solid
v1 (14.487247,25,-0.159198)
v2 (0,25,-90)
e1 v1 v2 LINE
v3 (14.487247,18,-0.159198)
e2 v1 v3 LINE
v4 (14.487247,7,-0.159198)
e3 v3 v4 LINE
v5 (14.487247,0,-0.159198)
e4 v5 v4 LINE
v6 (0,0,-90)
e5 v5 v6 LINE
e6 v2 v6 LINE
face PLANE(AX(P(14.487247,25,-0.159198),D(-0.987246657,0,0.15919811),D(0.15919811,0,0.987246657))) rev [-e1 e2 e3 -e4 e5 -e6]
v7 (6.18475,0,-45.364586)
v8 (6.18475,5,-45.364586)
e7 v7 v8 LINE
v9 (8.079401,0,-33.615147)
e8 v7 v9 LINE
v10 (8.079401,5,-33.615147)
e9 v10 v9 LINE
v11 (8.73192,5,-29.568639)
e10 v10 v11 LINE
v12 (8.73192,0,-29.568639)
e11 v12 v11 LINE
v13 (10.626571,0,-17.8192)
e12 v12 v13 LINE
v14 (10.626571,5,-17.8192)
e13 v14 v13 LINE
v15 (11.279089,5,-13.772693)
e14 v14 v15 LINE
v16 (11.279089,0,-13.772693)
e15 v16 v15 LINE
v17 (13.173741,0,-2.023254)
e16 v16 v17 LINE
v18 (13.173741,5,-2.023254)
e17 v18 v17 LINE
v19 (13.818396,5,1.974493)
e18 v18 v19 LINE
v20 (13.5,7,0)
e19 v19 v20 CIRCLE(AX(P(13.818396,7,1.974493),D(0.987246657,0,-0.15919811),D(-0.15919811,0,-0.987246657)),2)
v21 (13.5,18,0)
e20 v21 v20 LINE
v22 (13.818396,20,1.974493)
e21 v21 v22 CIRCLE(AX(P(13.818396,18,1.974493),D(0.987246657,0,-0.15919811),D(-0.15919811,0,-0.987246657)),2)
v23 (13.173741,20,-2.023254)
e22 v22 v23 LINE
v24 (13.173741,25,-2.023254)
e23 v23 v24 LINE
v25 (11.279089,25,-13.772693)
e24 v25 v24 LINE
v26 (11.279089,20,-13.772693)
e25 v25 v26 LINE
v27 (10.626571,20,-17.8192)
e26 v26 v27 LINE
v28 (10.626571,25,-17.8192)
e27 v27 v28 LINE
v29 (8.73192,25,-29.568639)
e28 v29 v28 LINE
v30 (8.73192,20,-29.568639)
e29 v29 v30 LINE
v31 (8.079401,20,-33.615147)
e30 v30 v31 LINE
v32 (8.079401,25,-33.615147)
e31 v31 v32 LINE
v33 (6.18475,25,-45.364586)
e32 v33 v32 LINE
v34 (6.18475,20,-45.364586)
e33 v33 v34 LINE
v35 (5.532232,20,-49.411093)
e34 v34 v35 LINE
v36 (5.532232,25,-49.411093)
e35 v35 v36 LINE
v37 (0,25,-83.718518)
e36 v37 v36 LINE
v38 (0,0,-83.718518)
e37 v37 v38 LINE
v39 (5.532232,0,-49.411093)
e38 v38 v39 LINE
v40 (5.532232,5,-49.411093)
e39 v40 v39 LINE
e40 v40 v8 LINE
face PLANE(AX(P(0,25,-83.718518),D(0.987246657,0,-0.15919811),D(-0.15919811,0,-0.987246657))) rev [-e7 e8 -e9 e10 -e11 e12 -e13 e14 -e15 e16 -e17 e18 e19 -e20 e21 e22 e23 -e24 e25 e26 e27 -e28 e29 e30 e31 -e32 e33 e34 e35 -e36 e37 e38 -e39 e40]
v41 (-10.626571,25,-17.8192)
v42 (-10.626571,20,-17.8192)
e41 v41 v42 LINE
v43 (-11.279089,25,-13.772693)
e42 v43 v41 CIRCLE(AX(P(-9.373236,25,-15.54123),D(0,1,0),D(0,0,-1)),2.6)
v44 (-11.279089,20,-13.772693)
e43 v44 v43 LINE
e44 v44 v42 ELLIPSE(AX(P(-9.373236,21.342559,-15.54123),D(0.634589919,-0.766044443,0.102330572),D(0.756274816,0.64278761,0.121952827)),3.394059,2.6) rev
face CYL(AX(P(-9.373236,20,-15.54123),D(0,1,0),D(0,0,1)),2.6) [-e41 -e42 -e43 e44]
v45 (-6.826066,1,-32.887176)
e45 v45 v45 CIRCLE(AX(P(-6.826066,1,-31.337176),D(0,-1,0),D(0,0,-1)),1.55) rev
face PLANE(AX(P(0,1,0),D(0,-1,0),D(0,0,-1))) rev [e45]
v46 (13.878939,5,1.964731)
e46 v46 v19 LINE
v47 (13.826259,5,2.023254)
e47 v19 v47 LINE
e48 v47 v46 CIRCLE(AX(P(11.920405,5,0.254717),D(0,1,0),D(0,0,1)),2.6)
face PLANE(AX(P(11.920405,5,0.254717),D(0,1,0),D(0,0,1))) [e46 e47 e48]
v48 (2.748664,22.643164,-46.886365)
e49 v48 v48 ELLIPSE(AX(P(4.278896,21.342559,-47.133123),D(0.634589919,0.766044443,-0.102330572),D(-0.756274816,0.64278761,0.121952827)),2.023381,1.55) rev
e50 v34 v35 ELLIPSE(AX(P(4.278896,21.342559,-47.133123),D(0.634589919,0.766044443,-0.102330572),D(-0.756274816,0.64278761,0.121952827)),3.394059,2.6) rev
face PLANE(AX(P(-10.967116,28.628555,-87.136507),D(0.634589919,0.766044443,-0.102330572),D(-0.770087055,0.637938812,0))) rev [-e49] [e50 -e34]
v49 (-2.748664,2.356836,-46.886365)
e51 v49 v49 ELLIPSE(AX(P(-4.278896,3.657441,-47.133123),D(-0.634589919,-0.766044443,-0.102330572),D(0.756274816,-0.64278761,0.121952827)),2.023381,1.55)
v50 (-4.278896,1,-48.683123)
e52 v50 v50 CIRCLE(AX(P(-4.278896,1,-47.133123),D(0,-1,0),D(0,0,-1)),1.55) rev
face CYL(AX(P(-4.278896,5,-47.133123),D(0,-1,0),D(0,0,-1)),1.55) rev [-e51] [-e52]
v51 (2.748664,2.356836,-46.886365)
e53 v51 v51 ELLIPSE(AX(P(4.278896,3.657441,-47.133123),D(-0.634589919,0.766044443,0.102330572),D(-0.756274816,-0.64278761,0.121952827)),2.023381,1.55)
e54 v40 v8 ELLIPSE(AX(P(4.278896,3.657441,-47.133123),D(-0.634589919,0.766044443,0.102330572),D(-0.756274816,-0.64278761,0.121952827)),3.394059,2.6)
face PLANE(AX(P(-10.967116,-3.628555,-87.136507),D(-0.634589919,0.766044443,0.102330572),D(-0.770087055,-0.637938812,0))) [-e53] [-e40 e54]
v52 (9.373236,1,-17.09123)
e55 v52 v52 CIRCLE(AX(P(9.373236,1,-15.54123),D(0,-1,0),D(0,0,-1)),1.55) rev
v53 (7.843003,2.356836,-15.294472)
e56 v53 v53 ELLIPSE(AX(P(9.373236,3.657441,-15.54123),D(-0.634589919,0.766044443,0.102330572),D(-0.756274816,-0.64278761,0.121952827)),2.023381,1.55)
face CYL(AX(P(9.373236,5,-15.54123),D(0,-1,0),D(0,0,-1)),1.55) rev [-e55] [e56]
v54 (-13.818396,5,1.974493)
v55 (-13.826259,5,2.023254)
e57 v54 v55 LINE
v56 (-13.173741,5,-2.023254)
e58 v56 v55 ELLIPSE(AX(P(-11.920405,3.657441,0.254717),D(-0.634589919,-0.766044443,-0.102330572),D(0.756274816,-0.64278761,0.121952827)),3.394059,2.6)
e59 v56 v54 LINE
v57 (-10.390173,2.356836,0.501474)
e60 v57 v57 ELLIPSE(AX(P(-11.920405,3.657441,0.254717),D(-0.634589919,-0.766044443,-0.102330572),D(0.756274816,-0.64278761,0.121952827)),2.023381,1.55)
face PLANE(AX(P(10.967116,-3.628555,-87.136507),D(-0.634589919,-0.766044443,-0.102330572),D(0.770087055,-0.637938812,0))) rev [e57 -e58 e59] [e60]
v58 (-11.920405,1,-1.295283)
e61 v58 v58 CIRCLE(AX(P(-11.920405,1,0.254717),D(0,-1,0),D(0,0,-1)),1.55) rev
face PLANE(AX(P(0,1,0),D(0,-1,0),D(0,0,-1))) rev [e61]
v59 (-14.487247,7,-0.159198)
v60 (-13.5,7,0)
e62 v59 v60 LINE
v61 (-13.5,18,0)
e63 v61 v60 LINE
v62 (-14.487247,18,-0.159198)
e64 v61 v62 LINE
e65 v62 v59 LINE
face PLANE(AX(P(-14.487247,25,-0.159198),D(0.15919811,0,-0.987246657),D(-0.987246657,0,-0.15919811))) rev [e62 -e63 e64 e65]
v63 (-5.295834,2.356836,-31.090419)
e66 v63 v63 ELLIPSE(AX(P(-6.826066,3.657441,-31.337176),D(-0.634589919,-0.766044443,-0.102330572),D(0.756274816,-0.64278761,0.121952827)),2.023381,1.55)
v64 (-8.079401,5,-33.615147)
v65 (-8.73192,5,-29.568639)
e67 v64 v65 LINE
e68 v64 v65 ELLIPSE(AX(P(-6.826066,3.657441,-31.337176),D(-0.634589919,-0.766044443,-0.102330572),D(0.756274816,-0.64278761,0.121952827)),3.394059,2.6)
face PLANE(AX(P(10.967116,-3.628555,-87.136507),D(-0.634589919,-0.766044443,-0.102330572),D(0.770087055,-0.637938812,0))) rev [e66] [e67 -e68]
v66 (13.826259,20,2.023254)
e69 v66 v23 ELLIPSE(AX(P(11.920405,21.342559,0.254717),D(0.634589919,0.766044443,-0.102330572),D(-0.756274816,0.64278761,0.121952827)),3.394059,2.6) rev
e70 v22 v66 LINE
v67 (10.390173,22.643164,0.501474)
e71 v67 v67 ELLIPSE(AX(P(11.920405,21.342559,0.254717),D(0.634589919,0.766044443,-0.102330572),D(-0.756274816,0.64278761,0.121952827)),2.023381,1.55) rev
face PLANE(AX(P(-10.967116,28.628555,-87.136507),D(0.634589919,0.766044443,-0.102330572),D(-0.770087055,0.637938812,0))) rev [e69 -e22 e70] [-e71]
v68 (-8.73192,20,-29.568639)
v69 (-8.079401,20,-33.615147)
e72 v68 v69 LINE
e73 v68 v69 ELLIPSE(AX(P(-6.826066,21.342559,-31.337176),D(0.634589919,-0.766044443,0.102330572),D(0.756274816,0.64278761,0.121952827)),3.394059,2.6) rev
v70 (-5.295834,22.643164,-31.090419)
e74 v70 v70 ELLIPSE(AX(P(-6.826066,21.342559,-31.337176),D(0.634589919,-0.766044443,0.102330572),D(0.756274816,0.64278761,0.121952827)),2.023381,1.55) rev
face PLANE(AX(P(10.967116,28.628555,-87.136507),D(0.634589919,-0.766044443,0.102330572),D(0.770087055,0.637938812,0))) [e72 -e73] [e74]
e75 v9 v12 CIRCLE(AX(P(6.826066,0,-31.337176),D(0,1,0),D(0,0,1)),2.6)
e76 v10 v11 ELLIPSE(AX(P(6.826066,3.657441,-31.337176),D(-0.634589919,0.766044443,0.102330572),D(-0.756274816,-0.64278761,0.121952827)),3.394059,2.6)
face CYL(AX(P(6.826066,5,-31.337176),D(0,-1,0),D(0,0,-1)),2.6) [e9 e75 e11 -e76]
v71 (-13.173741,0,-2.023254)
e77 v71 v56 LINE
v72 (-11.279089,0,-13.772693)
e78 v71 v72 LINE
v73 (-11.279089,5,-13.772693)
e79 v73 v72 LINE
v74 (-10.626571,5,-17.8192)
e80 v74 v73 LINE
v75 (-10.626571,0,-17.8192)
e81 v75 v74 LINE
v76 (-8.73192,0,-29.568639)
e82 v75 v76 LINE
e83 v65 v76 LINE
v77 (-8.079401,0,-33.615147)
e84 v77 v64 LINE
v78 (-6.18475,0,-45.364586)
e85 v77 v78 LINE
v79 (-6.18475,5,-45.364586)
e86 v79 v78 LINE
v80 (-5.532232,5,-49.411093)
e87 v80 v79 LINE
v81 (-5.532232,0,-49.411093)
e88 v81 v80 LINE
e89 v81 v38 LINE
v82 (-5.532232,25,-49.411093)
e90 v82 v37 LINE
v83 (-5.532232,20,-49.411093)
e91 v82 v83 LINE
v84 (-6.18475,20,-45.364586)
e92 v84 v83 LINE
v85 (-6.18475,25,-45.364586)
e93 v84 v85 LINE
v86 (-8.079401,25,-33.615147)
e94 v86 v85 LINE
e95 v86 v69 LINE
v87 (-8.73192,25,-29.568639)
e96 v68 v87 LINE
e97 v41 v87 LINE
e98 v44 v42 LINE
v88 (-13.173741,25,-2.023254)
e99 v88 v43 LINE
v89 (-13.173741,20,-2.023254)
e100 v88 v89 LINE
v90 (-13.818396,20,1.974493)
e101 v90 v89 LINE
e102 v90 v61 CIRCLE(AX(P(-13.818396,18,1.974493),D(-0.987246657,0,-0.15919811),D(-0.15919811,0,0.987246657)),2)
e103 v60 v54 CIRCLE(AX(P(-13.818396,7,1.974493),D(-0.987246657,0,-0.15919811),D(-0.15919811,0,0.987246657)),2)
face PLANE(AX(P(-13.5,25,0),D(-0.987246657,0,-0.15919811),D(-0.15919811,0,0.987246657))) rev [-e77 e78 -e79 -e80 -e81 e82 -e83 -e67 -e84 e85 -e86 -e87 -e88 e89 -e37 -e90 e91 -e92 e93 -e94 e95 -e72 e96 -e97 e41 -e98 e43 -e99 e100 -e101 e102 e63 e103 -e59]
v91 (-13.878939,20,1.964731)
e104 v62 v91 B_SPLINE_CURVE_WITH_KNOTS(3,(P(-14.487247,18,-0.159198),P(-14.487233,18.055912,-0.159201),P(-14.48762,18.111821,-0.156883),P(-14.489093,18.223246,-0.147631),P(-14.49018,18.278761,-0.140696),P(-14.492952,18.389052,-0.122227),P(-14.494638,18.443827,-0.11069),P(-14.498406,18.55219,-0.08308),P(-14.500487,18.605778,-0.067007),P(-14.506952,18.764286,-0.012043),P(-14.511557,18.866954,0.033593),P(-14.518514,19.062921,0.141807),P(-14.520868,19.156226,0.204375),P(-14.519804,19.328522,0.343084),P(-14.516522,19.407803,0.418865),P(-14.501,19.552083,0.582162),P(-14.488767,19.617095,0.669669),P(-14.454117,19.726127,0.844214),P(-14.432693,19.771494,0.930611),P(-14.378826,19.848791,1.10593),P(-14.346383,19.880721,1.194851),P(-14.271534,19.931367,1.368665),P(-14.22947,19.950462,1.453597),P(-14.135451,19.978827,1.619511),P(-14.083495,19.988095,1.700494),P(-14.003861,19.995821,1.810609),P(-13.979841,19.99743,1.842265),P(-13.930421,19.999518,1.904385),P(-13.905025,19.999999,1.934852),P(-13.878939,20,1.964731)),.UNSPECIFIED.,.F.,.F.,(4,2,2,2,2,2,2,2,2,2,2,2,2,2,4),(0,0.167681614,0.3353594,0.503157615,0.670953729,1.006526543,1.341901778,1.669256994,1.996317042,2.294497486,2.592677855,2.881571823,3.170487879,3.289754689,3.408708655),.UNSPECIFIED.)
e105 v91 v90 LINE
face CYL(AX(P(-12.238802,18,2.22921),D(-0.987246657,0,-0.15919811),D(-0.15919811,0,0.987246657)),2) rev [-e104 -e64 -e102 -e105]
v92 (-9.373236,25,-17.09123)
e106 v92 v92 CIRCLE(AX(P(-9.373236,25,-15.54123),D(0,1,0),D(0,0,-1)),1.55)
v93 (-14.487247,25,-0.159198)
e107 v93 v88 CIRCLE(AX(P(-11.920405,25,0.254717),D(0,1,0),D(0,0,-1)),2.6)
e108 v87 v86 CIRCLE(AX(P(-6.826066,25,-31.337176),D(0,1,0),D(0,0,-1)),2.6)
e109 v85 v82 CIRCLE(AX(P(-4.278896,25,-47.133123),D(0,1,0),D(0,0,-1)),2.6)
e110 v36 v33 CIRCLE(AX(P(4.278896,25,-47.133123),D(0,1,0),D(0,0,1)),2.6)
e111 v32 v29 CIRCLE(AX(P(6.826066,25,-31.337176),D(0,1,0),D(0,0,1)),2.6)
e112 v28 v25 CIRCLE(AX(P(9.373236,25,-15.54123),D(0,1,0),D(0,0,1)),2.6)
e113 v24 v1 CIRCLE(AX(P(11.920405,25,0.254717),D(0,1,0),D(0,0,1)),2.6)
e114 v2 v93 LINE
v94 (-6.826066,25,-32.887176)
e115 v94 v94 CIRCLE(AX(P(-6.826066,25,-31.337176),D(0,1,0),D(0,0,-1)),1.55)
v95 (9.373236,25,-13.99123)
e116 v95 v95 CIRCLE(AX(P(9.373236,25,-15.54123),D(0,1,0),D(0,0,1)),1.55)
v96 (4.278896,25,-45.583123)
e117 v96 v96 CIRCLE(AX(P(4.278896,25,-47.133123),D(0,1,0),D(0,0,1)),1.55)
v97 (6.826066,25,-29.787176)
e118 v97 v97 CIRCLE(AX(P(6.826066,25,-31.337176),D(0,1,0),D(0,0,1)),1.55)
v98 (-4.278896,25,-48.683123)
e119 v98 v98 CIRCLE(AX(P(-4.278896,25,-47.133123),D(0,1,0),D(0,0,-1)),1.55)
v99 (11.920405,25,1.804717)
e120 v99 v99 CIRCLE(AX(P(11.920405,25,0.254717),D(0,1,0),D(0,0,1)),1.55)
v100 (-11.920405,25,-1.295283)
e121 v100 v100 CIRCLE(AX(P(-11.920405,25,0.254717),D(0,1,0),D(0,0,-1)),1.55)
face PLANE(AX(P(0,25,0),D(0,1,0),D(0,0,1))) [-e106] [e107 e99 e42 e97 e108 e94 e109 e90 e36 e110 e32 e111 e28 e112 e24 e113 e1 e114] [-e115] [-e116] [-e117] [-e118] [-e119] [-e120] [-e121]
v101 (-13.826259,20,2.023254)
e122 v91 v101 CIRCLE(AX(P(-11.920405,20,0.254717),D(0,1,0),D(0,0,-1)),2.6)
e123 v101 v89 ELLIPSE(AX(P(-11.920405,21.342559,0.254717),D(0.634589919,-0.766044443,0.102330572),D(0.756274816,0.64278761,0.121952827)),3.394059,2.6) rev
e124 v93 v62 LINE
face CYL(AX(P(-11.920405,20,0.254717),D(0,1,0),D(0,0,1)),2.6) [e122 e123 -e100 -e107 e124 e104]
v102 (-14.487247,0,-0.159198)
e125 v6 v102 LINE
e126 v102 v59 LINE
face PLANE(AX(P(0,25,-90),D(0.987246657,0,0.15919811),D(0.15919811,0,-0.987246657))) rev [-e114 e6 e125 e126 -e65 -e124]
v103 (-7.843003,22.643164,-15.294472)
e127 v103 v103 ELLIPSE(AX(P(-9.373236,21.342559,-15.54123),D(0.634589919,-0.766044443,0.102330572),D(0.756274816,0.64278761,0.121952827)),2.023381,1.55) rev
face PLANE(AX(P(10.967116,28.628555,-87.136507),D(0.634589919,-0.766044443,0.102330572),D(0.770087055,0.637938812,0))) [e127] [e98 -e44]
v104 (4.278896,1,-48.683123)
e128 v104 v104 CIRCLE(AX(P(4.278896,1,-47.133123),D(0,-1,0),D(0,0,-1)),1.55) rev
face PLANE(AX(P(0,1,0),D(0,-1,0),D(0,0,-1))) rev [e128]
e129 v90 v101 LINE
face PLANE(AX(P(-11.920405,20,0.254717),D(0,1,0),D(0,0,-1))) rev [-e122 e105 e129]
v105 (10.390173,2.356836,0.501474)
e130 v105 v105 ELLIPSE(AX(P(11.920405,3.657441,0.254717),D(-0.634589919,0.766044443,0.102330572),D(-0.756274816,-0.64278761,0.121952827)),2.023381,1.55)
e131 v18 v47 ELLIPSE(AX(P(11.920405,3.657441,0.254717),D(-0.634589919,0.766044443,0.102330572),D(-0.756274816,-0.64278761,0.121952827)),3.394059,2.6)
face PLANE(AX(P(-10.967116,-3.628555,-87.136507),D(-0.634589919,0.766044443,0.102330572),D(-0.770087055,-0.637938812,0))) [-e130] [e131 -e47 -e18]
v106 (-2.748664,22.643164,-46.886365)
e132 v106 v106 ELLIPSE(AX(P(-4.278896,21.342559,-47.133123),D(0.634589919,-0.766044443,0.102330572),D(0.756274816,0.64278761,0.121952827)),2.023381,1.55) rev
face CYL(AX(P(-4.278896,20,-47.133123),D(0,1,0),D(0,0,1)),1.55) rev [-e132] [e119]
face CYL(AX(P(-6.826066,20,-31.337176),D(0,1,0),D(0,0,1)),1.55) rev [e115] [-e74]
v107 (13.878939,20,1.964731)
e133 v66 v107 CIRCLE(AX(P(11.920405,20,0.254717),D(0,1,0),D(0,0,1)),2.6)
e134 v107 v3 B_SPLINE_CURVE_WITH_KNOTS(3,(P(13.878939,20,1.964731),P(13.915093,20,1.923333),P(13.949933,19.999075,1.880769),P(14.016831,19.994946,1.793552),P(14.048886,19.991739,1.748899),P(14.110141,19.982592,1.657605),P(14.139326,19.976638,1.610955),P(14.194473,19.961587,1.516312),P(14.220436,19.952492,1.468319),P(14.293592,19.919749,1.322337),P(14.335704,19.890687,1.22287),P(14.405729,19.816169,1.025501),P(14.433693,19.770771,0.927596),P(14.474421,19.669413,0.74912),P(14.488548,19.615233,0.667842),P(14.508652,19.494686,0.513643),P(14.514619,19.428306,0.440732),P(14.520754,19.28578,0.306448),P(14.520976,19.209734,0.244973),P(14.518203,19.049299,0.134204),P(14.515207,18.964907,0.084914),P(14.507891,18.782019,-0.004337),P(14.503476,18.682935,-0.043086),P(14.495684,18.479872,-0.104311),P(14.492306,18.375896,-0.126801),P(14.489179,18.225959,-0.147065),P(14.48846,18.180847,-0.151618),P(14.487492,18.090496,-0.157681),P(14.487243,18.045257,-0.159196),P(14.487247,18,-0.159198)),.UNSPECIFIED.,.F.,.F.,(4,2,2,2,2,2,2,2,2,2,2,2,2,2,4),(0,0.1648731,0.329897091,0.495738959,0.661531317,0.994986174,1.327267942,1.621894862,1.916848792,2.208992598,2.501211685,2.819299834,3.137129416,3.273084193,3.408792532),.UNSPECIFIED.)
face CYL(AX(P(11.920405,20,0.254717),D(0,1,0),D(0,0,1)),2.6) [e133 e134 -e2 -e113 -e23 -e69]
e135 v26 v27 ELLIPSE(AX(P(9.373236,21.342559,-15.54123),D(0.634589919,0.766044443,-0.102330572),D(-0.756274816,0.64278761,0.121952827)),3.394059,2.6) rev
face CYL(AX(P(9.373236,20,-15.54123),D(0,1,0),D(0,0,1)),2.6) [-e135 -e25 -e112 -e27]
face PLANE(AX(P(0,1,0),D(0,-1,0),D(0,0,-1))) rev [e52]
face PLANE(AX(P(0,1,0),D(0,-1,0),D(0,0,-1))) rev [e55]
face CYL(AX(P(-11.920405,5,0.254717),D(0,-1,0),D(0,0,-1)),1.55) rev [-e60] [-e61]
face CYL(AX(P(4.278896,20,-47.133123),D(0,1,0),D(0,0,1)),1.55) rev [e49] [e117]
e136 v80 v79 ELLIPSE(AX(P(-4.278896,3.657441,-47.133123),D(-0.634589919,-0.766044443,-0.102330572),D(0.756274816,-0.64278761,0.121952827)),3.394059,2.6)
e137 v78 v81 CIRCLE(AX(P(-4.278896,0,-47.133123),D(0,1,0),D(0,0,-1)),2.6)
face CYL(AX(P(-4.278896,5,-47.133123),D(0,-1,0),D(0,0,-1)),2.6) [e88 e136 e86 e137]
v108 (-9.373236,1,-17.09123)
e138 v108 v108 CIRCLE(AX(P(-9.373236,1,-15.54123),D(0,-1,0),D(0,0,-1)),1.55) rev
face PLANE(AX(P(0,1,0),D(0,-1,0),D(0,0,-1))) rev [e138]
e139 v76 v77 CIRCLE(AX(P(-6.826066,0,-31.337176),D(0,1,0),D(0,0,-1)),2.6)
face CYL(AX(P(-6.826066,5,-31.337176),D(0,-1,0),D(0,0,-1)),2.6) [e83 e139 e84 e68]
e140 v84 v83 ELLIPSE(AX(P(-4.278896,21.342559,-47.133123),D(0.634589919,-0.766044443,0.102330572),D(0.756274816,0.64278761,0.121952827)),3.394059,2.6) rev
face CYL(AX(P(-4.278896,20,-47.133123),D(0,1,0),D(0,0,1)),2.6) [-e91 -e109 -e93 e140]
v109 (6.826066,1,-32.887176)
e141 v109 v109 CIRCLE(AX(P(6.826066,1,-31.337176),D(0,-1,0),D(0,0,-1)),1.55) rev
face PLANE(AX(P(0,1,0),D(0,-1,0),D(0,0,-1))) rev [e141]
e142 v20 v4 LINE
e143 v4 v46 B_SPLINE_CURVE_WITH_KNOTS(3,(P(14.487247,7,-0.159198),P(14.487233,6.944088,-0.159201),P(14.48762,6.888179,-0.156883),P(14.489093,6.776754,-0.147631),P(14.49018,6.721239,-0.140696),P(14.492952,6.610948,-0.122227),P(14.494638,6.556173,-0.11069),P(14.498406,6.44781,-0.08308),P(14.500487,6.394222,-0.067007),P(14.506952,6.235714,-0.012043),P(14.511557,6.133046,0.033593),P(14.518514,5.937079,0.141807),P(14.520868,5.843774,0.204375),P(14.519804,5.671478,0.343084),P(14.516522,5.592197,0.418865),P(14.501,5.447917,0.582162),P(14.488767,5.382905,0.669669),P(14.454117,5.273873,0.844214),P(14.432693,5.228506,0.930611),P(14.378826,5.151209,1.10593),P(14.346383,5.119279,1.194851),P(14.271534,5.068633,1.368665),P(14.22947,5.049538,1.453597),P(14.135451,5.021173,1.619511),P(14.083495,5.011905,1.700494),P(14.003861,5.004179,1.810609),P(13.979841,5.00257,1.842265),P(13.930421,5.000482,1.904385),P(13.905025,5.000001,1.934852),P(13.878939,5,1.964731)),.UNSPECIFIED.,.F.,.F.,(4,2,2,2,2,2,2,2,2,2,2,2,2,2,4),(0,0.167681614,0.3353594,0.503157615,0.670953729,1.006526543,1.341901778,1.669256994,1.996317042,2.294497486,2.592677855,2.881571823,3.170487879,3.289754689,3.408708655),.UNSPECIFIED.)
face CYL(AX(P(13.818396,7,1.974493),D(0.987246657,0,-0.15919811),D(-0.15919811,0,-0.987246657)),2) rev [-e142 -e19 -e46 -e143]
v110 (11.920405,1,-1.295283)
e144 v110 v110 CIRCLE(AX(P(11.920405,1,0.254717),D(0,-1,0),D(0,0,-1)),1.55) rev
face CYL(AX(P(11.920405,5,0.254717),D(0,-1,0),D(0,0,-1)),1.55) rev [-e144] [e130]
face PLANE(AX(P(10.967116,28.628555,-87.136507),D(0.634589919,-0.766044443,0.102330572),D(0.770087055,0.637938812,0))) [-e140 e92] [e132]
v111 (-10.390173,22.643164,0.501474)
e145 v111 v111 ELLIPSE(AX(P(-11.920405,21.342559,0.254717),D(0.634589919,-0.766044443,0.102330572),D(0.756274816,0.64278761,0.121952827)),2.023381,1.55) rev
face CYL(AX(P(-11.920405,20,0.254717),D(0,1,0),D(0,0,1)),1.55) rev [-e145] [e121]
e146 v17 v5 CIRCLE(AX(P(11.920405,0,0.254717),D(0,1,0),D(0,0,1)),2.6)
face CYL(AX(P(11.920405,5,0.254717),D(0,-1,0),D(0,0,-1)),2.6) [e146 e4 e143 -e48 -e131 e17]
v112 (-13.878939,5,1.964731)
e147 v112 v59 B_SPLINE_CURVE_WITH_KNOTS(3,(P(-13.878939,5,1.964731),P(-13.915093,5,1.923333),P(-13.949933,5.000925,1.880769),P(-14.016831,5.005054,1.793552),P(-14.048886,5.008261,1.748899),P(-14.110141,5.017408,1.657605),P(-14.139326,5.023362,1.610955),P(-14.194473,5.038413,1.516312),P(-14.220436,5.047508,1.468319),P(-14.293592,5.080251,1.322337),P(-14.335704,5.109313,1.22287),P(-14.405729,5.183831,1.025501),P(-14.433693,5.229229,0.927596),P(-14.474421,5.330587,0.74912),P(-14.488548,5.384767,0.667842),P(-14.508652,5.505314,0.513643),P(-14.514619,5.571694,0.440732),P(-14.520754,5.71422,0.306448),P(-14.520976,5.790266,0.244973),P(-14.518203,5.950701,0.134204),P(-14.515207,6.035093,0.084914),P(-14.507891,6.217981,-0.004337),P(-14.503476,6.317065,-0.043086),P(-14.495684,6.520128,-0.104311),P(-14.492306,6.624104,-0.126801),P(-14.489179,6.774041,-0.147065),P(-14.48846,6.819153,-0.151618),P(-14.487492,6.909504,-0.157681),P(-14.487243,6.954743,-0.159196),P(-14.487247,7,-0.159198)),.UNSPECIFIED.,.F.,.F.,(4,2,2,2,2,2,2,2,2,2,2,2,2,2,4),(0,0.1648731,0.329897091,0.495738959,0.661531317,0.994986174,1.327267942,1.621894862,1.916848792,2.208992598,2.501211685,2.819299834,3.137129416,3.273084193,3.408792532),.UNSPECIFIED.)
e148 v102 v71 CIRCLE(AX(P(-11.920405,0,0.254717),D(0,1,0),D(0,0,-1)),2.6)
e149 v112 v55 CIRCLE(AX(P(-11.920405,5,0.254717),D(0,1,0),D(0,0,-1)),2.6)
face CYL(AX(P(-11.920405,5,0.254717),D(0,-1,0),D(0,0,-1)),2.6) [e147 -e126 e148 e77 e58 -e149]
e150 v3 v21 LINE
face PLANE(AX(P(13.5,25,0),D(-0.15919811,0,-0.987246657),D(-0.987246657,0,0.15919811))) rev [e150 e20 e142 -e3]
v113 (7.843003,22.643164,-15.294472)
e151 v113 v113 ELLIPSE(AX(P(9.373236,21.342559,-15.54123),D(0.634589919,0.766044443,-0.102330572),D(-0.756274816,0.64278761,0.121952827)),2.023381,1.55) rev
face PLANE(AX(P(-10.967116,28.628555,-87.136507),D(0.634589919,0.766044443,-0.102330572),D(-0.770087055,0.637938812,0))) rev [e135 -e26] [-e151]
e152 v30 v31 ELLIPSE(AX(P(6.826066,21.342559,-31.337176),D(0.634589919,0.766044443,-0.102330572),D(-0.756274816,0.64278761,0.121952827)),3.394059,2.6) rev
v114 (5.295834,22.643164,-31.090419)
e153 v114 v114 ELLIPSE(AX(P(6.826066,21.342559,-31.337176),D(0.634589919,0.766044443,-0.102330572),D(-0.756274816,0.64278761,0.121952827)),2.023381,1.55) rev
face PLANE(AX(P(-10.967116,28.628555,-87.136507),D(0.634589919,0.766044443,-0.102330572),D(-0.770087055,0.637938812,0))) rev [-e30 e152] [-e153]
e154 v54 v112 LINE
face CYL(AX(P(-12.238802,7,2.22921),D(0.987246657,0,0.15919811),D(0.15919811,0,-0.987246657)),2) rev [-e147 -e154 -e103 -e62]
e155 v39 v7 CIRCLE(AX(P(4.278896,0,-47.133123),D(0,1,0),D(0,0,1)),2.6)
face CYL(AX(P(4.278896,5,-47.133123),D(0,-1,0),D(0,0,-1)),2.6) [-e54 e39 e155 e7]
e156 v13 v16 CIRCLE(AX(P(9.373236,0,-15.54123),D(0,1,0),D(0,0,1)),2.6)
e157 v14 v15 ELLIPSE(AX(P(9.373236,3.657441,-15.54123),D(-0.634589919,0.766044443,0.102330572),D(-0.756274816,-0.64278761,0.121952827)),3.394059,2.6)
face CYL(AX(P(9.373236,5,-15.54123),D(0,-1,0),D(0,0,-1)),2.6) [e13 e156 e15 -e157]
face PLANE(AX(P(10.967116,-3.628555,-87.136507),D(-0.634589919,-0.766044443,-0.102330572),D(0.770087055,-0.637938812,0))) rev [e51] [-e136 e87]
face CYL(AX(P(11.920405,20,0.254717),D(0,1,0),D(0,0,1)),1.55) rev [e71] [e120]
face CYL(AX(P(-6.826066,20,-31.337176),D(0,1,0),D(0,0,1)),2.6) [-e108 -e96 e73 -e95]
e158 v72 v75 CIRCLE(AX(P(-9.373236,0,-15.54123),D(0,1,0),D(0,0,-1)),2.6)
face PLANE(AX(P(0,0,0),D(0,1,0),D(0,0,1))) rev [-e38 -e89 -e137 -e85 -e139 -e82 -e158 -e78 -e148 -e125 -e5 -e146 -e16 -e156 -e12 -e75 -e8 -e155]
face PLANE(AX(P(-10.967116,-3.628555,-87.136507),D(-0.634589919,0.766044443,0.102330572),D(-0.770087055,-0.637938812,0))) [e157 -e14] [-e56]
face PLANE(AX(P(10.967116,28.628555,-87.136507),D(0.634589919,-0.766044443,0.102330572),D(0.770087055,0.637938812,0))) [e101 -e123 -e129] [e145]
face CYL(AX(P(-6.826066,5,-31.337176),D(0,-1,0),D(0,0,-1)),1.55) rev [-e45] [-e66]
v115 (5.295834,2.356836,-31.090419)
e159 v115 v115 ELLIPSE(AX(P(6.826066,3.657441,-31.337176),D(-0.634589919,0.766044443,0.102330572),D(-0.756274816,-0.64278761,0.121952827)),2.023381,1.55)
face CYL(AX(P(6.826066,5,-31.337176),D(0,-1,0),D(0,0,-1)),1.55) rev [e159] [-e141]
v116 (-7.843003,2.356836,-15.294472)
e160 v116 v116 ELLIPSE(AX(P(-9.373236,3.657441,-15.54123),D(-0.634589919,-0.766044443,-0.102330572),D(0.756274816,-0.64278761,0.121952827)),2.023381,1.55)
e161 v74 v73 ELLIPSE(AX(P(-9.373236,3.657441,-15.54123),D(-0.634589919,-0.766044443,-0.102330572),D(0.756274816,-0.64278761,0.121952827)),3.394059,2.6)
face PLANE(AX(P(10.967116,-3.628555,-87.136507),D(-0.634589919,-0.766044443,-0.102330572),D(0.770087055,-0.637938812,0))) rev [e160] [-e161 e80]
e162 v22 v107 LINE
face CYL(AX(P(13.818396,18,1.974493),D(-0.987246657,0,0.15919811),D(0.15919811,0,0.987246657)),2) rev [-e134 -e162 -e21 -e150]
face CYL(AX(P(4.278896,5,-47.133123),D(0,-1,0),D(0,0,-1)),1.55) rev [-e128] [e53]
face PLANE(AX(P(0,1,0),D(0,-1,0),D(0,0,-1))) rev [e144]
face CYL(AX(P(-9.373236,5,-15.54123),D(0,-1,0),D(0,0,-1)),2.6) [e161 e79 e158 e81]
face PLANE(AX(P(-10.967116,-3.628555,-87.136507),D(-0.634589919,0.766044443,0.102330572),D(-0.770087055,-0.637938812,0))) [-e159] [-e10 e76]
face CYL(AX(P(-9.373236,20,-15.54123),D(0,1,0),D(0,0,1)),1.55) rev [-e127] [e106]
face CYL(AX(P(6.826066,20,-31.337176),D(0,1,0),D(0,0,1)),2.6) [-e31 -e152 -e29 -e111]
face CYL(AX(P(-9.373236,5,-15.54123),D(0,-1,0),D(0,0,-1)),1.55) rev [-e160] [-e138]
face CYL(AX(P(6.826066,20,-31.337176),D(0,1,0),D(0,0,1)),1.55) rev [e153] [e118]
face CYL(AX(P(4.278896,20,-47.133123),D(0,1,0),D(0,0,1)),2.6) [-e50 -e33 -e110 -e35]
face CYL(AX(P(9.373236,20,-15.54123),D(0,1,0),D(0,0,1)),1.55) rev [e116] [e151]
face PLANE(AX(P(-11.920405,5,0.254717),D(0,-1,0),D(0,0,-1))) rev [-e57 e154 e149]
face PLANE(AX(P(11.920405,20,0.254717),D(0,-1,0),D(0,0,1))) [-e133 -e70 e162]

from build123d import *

# Parameters (mm, degrees)
BOSS_EXTRUDE1_DEPTH            = 25
SKETCH2_R                      = 2.6
SKETCH2_R_2                    = 1.55
BOSS_EXTRUDE3_DEPTH            = 5
CUT_EXTRUDE1_REACH             = 98.604
CUT_EXTRUDE1_DIRECTION_2_DEPTH = 97.603907966
CUT_EXTRUDE2_REACH             = 98.604
CUT_EXTRUDE2_DIRECTION_2_DEPTH = 97.603907966
FILLET1_R                      = 2
SKETCH6_R                      = 2.6
BOSS_EXTRUDE4_DEPTH            = 1


with BuildPart() as part:
    # Sketch1 → Boss-Extrude1 (new body)
    with BuildSketch(Plane(origin=(0, 0, 0), x_dir=(1, 0, 0), z_dir=(0, 1, 0))):
        Polygon((-13.5, 0), (0, 83.718518379), (13.5, 0), (14.487246657, 0.15919811), (0, 90), (-14.487246657, 0.15919811), align=None)
    extrude(amount=BOSS_EXTRUDE1_DEPTH)

    # Sketch2 → Boss-Extrude3 (add)
    # profile 1 of 8: a face of its own
    with BuildSketch(Plane(origin=(0, 0, 0), x_dir=(1, 0, 0), z_dir=(0, 1, 0))):
        with Locations((11.920405349, -0.254716975)):
            Circle(SKETCH2_R)
        with Locations(Location((11.920405349, -0.254716975, 0), (0, 0, 270))):
            Circle(SKETCH2_R_2, mode=Mode.SUBTRACT)
    # profile 2 of 8: a face of its own
    with BuildSketch(Plane(origin=(0, 0, 0), x_dir=(1, 0, 0), z_dir=(0, 1, 0))):
        with Locations((9.373235594, 15.541229537)):
            Circle(SKETCH2_R)
        with Locations(Location((9.373235594, 15.541229537, 0), (0, 0, 270))):
            Circle(SKETCH2_R_2, mode=Mode.SUBTRACT)
    # profile 3 of 8: a face of its own
    with BuildSketch(Plane(origin=(0, 0, 0), x_dir=(1, 0, 0), z_dir=(0, 1, 0))):
        with Locations((6.826065839, 31.33717605)):
            Circle(SKETCH2_R)
        with Locations(Location((6.826065839, 31.33717605, 0), (0, 0, 270))):
            Circle(SKETCH2_R_2, mode=Mode.SUBTRACT)
    # profile 4 of 8: a face of its own
    with BuildSketch(Plane(origin=(0, 0, 0), x_dir=(1, 0, 0), z_dir=(0, 1, 0))):
        with Locations((4.278896085, 47.133122563)):
            Circle(SKETCH2_R)
        with Locations(Location((4.278896085, 47.133122563, 0), (0, 0, 270))):
            Circle(SKETCH2_R_2, mode=Mode.SUBTRACT)
    # profile 5 of 8: a face of its own
    with BuildSketch(Plane(origin=(0, 0, 0), x_dir=(1, 0, 0), z_dir=(0, 1, 0))):
        with Locations((-4.278896085, 47.133122563)):
            Circle(SKETCH2_R)
        with Locations(Location((-4.278896085, 47.133122563, 0), (0, 0, 90))):
            Circle(SKETCH2_R_2, mode=Mode.SUBTRACT)
    # profile 6 of 8: a face of its own
    with BuildSketch(Plane(origin=(0, 0, 0), x_dir=(1, 0, 0), z_dir=(0, 1, 0))):
        with Locations((-6.826065839, 31.33717605)):
            Circle(SKETCH2_R)
        with Locations(Location((-6.826065839, 31.33717605, 0), (0, 0, 90))):
            Circle(SKETCH2_R_2, mode=Mode.SUBTRACT)
    # profile 7 of 8: a face of its own
    with BuildSketch(Plane(origin=(0, 0, 0), x_dir=(1, 0, 0), z_dir=(0, 1, 0))):
        with Locations((-9.373235594, 15.541229537)):
            Circle(SKETCH2_R)
        with Locations(Location((-9.373235594, 15.541229537, 0), (0, 0, 90))):
            Circle(SKETCH2_R_2, mode=Mode.SUBTRACT)
    # profile 8 of 8: a face of its own
    with BuildSketch(Plane(origin=(0, 0, 0), x_dir=(1, 0, 0), z_dir=(0, 1, 0))):
        with Locations((-11.920405349, -0.254716975)):
            Circle(SKETCH2_R)
        with Locations(Location((-11.920405349, -0.254716975, 0), (0, 0, 90))):
            Circle(SKETCH2_R_2, mode=Mode.SUBTRACT)
    boss_extrude3 = extrude(amount=BOSS_EXTRUDE3_DEPTH)

    # Cut-Extrude1: up to this face of the body (flat: up to its plane)
    cut_extrude1_end = Plane(part.part.faces().sort_by_distance((-6.667350715, 12.850191169, -42.371798131))[0])
    # Sketch4 → Cut-Extrude1 (cut, up to the picked face)
    with BuildSketch(Plane(origin=(0.342144515, 0, 2.121765321), x_dir=(0.9872466570606503, 0, -0.1591981096702188), z_dir=(0.1591981096702188, 0, 0.9872466570606503)), mode=Mode.PRIVATE) as cut_extrude1_sk1:
        Polygon((13.32782987, 5), (9.12782987, 5), (9.12782987, 1.475781549), align=None)
    cut_extrude1_tool1 = split(extrude(cut_extrude1_sk1.sketch, amount=-CUT_EXTRUDE1_REACH, mode=Mode.PRIVATE), bisect_by=cut_extrude1_end, keep=Keep.BOTH, mode=Mode.PRIVATE)
    cut_extrude1 = cut_extrude1_tool1.solids().sort_by(Axis((10.735709, 3.825261, 0.445755), (-0.1591981096702188, 0, -0.9872466570606503)))[0]
    add(cut_extrude1, mode=Mode.SUBTRACT)

    # Sketch4 → Cut-Extrude1 direction 2 (cut)
    with BuildSketch(Plane(origin=(0.342144515, 0, 2.121765321), x_dir=(0.9872466570606503, 0, -0.1591981096702188), z_dir=(0.1591981096702188, 0, 0.9872466570606503))):
        Polygon((13.32782987, 5), (9.12782987, 5), (9.12782987, 1.475781549), align=None)
    cut_extrude1_direction_2 = extrude(amount=CUT_EXTRUDE1_DIRECTION_2_DEPTH, mode=Mode.SUBTRACT)

    # Cut-Extrude2: up to this face of the body (flat: up to its plane)
    cut_extrude2_end = Plane(part.part.faces().sort_by_distance((6.667350715, 12.850191169, -42.371798131))[0])
    # Sketch5 → Cut-Extrude2 (cut, up to the picked face)
    with BuildSketch(Plane(origin=(-0.342144515, 0, 2.121765321), x_dir=(0.9872466570606502, 0, 0.15919810967021986), z_dir=(-0.15919810967021986, 0, 0.9872466570606502)), mode=Mode.PRIVATE) as cut_extrude2_sk1:
        Polygon((-9.12782987, 5), (-9.12782987, 1.475781549), (-13.32782987, 5), align=None)
    cut_extrude2_tool1 = split(extrude(cut_extrude2_sk1.sketch, amount=-CUT_EXTRUDE2_REACH, mode=Mode.PRIVATE), bisect_by=cut_extrude2_end, keep=Keep.BOTH, mode=Mode.PRIVATE)
    cut_extrude2 = cut_extrude2_tool1.solids().sort_by(Axis((-10.735709, 3.825261, 0.445755), (0.15919810967021986, 0, -0.9872466570606502)))[0]
    add(cut_extrude2, mode=Mode.SUBTRACT)

    # Sketch5 → Cut-Extrude2 direction 2 (cut)
    with BuildSketch(Plane(origin=(-0.342144515, 0, 2.121765321), x_dir=(0.9872466570606502, 0, 0.15919810967021986), z_dir=(-0.15919810967021986, 0, 0.9872466570606502))):
        Polygon((-9.12782987, 5), (-9.12782987, 1.475781549), (-13.32782987, 5), align=None)
    cut_extrude2_direction_2 = extrude(amount=CUT_EXTRUDE2_DIRECTION_2_DEPTH, mode=Mode.SUBTRACT)

    # Mirror2: Boss-Extrude3, Cut-Extrude1, Cut-Extrude1 direction 2, Cut-Extrude2, Cut-Extrude2 direction 2 across plane
    add(boss_extrude3.mirror(Plane.ZX.offset(12.5)))
    add(cut_extrude1.mirror(Plane.ZX.offset(12.5)), mode=Mode.SUBTRACT)
    add(cut_extrude1_direction_2.mirror(Plane.ZX.offset(12.5)), mode=Mode.SUBTRACT)
    add(cut_extrude2.mirror(Plane.ZX.offset(12.5)), mode=Mode.SUBTRACT)
    add(cut_extrude2_direction_2.mirror(Plane.ZX.offset(12.5)), mode=Mode.SUBTRACT)

    # Fillet1
    # the kernel refuses this fillet: 2 mm, written as the material it adds along each edge
    with BuildSketch(Plane(origin=(-19.423479942, 5, -0.955188658), x_dir=(-0.15919810967021975, 0, 0.9872466570606501), z_dir=(0.9872466570606501, 0, 0.15919810967021975))) as fillet1_piece_1_section:
        with BuildLine():
            CenterArc((FILLET1_R, -FILLET1_R), FILLET1_R, 90, 90)
            Line((0, -FILLET1_R), (0, 0))
            Line((0, 0), (FILLET1_R, 0))
        make_face()
    fillet1_piece_1 = extrude(amount=6, mode=Mode.PRIVATE)
    fillet1_piece_1 = fillet1_piece_1 & Plane(origin=(-11.920405349, 5.222362792, 0.254716975), x_dir=(1, 0, 0), z_dir=(0, -1, 0)) * Cylinder(2.6, 21, mode=Mode.PRIVATE)
    add(fillet1_piece_1)
    with BuildSketch(Plane(origin=(13.5, 5, 0), x_dir=(0, 1, 0), z_dir=(0.9872466570606502, 0, -0.15919810967021866))) as fillet1_piece_2_section:
        with BuildLine():
            CenterArc((FILLET1_R, FILLET1_R), FILLET1_R, 180, 90)
            Line((0, FILLET1_R), (0, 0))
            Line((0, 0), (FILLET1_R, 0))
        make_face()
    fillet1_piece_2 = extrude(amount=6, mode=Mode.PRIVATE)
    fillet1_piece_2 = fillet1_piece_2 & Plane(origin=(11.920405349, 5.699977741, 0.254716975), x_dir=(1, 0, 0), z_dir=(0, -1, 0)) * Cylinder(2.6, 20, mode=Mode.PRIVATE)
    add(fillet1_piece_2)
    with BuildSketch(Plane(origin=(13.5, 20, 0), x_dir=(0, -1, 0), z_dir=(0.9872466570606502, 0, -0.15919810967021866))) as fillet1_piece_3_section:
        with BuildLine():
            CenterArc((FILLET1_R, -FILLET1_R), FILLET1_R, 90, 90)
            Line((0, -FILLET1_R), (0, 0))
            Line((0, 0), (FILLET1_R, 0))
        make_face()
    fillet1_piece_3 = extrude(amount=6, mode=Mode.PRIVATE)
    fillet1_piece_3 = fillet1_piece_3 & Plane(origin=(11.920405349, 19.300022259, 0.254716975), x_dir=(1, 0, 0), z_dir=(0, 1, 0)) * Cylinder(2.6, 20, mode=Mode.PRIVATE)
    add(fillet1_piece_3)
    with BuildSketch(Plane(origin=(-19.423479942, 20, -0.955188658), x_dir=(0, -1, 0), z_dir=(0.9872466570606501, 0, 0.15919810967021975))) as fillet1_piece_4_section:
        with BuildLine():
            CenterArc((FILLET1_R, -FILLET1_R), FILLET1_R, 90, 90)
            Line((0, -FILLET1_R), (0, 0))
            Line((0, 0), (FILLET1_R, 0))
        make_face()
    fillet1_piece_4 = extrude(amount=6, mode=Mode.PRIVATE)
    fillet1_piece_4 = fillet1_piece_4 & Plane(origin=(-11.920405349, 19.777637105, 0.254716975), x_dir=(1, 0, 0), z_dir=(0, 1, 0)) * Cylinder(2.6, 21, mode=Mode.PRIVATE)
    add(fillet1_piece_4)

    # Sketch6 → Boss-Extrude4 (add)
    with BuildSketch(Plane.XZ):
        with Locations((11.920405349, 0.254716975)):
            Circle(SKETCH6_R)
        with Locations((9.373235594, -15.541229537)):
            Circle(SKETCH6_R)
        with Locations((6.826065839, -31.33717605)):
            Circle(SKETCH6_R)
        with Locations((4.278896085, -47.133122563)):
            Circle(SKETCH6_R)
        with Locations((-4.278896085, -47.133122563)):
            Circle(SKETCH6_R)
        with Locations((-6.826065839, -31.33717605)):
            Circle(SKETCH6_R)
        with Locations((-9.373235594, -15.541229537)):
            Circle(SKETCH6_R)
        with Locations((-11.920405349, 0.254716975)):
            Circle(SKETCH6_R)
    extrude(amount=-BOSS_EXTRUDE4_DEPTH)


solid = part.part
